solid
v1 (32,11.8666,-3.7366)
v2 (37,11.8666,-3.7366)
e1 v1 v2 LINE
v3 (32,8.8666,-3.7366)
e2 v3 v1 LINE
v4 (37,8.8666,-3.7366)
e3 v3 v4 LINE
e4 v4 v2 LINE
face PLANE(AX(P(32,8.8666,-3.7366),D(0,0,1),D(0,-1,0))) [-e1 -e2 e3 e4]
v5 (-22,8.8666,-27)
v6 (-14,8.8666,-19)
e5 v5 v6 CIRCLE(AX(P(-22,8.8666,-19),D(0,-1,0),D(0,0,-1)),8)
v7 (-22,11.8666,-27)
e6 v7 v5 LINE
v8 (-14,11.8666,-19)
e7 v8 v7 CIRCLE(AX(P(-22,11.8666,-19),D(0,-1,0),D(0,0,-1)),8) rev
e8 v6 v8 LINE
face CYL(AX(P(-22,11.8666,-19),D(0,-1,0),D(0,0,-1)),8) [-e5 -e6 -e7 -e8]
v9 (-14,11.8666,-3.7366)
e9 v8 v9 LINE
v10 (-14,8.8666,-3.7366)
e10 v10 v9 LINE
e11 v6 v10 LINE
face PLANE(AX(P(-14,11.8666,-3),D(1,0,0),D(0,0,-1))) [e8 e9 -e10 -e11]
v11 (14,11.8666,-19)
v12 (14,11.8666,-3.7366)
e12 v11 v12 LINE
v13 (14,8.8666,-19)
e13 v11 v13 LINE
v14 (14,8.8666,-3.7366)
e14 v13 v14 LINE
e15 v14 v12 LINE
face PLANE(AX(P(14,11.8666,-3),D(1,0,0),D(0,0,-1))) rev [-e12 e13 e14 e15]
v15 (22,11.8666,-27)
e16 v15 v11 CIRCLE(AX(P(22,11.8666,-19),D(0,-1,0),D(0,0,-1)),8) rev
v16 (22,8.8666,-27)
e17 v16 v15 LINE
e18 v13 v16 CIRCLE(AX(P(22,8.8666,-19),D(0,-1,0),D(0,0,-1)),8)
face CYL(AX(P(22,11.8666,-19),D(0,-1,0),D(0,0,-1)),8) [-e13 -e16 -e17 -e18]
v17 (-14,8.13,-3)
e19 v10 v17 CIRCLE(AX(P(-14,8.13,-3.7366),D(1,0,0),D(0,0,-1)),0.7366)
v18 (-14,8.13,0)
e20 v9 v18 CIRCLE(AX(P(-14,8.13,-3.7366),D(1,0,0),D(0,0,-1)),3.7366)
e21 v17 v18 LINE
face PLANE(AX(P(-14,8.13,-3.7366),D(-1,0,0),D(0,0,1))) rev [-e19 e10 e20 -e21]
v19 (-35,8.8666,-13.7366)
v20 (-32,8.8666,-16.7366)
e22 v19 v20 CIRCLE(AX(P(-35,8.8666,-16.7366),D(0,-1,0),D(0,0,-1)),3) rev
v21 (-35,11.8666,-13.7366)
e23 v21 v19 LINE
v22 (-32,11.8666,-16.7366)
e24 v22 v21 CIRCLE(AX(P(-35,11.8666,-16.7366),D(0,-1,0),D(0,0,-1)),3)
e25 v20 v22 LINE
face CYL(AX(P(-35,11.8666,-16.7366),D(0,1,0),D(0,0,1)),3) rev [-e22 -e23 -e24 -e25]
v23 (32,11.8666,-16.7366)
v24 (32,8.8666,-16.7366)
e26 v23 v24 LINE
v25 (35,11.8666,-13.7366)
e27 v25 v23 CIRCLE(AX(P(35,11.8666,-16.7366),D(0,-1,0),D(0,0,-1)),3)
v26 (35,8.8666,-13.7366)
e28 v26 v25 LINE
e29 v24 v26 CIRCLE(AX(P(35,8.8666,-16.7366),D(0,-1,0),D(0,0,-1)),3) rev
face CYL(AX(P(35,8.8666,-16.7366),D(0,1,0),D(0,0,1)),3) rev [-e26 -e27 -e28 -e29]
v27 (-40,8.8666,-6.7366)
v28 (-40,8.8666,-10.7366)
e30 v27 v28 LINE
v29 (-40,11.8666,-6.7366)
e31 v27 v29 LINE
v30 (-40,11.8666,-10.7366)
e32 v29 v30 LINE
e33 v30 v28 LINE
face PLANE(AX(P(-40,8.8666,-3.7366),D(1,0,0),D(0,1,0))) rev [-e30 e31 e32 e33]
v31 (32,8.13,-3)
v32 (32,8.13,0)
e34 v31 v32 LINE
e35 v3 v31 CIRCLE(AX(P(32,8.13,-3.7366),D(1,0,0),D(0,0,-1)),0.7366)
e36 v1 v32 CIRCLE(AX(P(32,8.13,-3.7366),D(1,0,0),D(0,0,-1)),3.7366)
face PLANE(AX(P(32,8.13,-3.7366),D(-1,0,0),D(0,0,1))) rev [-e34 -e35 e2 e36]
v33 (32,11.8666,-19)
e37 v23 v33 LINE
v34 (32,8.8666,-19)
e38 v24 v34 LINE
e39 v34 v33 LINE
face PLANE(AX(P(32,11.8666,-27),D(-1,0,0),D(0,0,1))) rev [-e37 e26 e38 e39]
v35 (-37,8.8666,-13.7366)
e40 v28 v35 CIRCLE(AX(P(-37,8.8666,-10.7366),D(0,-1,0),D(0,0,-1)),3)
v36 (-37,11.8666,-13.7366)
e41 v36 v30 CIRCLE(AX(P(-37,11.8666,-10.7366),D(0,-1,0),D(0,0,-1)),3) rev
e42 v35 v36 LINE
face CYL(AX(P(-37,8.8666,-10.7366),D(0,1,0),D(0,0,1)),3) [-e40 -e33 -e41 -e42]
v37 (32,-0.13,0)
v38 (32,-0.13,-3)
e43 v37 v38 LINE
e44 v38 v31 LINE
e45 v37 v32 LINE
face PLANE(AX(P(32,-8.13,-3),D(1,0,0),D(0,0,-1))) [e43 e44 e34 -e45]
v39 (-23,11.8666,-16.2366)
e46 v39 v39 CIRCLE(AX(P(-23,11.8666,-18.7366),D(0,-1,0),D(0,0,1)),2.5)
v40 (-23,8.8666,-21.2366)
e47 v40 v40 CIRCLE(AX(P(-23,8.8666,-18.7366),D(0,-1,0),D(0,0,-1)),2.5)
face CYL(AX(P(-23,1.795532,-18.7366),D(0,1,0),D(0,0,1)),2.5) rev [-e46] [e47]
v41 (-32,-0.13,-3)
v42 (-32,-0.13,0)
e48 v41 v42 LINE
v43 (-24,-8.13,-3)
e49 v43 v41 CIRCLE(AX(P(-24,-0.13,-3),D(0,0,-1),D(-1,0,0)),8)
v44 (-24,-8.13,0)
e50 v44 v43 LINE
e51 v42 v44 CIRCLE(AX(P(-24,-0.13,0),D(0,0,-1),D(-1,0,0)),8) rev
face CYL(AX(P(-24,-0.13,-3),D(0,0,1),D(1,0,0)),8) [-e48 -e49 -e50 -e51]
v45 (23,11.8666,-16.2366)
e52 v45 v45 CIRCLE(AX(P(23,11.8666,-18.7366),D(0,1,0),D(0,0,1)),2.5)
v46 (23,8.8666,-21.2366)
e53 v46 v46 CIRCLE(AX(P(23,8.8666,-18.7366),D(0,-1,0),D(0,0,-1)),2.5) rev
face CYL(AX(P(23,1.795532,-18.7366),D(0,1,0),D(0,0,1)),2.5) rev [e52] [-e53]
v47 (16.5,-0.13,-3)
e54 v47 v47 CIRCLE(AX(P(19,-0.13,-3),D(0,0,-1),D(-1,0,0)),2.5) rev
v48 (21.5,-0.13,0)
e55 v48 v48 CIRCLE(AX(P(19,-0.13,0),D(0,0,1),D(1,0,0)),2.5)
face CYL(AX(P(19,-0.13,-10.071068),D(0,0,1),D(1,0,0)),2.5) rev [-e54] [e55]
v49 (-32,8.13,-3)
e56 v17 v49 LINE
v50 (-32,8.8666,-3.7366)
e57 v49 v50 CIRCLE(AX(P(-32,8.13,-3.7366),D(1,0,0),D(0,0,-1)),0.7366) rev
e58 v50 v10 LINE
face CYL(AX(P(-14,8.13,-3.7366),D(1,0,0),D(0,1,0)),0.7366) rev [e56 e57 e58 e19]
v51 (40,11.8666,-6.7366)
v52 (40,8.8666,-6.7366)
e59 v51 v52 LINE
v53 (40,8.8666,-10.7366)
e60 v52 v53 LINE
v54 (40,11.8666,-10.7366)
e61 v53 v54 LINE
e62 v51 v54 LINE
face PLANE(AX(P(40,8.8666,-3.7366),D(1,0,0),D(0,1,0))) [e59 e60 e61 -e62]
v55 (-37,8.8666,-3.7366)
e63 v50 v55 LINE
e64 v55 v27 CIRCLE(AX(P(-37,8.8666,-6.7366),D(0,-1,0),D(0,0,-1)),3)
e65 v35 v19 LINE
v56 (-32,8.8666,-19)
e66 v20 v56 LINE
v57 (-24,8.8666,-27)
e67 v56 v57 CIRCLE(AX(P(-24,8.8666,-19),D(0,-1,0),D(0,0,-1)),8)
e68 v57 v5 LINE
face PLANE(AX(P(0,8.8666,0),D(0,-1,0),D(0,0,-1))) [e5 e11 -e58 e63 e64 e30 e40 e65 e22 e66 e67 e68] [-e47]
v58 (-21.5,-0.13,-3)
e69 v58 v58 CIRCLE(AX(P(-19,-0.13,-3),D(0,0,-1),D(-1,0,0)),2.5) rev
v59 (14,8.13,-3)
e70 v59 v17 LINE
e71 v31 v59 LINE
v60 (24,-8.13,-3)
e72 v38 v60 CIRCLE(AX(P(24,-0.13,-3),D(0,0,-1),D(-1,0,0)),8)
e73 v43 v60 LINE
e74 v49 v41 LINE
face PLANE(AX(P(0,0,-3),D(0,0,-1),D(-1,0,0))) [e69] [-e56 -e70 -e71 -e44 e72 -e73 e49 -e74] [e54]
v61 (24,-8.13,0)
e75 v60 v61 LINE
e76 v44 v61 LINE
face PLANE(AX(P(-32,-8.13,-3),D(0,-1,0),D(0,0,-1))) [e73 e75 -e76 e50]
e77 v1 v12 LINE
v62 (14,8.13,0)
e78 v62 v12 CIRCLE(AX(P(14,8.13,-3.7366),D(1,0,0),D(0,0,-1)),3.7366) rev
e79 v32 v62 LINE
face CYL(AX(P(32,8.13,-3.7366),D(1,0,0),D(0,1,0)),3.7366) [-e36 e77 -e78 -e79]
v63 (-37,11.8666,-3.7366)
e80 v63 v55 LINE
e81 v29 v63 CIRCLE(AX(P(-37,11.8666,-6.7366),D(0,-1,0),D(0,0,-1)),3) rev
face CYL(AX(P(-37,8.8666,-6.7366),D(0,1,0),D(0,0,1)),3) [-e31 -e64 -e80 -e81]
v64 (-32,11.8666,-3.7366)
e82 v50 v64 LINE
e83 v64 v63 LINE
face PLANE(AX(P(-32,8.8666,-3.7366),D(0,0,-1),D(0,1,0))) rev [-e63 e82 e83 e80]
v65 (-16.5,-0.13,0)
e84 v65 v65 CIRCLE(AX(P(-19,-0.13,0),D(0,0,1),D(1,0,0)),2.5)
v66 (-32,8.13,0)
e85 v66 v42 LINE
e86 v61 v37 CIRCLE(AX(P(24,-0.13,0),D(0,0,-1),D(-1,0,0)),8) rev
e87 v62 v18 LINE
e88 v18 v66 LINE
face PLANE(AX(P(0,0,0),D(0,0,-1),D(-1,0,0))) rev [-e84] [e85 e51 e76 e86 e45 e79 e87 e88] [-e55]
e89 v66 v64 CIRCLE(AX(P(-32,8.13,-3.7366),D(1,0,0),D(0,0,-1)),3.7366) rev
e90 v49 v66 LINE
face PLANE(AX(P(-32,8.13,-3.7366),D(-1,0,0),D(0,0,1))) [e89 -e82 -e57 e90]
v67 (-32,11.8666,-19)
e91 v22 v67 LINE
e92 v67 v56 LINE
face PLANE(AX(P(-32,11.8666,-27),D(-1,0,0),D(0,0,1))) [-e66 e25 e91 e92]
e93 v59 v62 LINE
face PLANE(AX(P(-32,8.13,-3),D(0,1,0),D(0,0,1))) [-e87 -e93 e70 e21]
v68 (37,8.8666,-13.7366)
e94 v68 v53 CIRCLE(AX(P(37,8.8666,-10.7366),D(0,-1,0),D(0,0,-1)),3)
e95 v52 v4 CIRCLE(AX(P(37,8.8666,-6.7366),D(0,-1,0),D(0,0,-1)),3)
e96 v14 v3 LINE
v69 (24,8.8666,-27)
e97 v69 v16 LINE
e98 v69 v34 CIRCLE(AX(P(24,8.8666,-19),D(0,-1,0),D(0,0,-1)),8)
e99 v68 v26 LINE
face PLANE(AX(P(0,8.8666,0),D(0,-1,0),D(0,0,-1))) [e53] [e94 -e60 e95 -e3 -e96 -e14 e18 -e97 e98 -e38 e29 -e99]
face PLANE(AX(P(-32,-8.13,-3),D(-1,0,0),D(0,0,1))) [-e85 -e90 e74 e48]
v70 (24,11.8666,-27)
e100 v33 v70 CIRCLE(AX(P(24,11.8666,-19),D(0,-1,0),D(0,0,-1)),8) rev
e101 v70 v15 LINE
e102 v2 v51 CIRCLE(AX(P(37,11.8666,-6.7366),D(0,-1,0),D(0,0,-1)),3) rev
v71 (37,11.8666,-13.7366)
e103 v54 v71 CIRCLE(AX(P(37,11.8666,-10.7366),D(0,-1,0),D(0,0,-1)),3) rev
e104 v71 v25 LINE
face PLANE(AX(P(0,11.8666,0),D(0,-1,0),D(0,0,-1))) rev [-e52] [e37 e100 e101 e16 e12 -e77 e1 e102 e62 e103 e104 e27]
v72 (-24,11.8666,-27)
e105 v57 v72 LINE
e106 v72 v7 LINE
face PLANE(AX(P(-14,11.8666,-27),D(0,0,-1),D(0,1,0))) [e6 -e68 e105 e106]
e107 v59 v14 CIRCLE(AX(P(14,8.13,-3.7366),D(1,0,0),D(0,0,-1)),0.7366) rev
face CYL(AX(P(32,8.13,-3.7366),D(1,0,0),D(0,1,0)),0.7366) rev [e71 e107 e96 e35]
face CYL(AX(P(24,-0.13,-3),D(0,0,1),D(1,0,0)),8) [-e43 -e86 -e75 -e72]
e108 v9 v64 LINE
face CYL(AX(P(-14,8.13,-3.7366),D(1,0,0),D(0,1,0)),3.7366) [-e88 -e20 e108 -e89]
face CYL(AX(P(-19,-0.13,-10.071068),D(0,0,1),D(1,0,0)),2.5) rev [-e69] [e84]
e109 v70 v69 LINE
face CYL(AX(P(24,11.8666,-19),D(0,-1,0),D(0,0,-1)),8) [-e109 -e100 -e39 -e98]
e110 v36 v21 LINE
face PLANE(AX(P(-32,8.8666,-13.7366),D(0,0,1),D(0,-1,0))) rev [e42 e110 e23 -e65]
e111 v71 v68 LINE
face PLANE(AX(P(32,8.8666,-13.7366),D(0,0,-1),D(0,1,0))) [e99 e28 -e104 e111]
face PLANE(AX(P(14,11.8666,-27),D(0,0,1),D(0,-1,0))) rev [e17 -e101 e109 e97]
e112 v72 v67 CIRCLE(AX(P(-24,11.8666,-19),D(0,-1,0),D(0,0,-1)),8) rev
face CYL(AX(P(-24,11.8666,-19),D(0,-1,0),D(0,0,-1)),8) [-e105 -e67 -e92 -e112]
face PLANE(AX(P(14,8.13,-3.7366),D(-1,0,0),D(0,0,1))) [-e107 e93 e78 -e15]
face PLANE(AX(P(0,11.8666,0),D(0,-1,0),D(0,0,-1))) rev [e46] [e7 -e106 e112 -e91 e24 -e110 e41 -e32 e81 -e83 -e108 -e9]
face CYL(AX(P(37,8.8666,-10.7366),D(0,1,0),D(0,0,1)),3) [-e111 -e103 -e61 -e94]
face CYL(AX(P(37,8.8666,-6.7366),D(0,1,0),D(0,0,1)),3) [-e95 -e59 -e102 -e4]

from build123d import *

# Parameters (mm, degrees)
SKETCH2_W            = 64
SKETCH2_H            = 16.26
BASE_FLANGE1_DEPTH   = 3
EDGE_FLANGE1_DEPTH   = 18
SKETCH10_R           = 2.5
CUT_EXTRUDE1_DEPTH   = 3
FILLET1_R            = 8
SKETCH14_R           = 2.5
SKETCH14_R_2         = 1
CUT_EXTRUDE5_DEPTH   = 3
SKETCH15_W           = 8
SKETCH15_H           = 10
TAB1_DEPTH           = 3
FILLET4_R            = 8
FILLET5_R            = 3
FILLET4_OF_MIRROR1_R = 8
FILLET5_OF_MIRROR1_R = 3


# Sheet-metal steps are written as plain solids
with BuildPart() as part:
    # Sketch2 → Base-Flange1 (new body)
    with BuildSketch(Plane.XY):
        Rectangle(SKETCH2_W, SKETCH2_H)
    extrude(amount=-BASE_FLANGE1_DEPTH)

    # Edge-Flange1 section (across the edge) → Edge-Flange1 (add)
    with BuildSketch(Plane(origin=(14, 8.8666, -3), x_dir=(0, -1, 0), z_dir=(1, 0, 0))):
        with BuildLine():
            Line((-3, 0.7366), (-3, 24))
            Line((-3, 24), (0, 24))
            Line((0, 24), (0, 0.7366))
            ThreePointArc((0, 0.7366), (0.215745145, 0.215745145), (0.7366, 0))
            Line((0.7366, 0), (0.7366, -3))
            ThreePointArc((0.7366, -3), (-1.905575199, -1.905575199), (-3, 0.7366))
        make_face()
    edge_flange1 = extrude(amount=EDGE_FLANGE1_DEPTH)

    # Sketch10 → Cut-Extrude1 (cut)
    with BuildSketch(Plane.XY):
        with Locations((-19, -0.13)):
            Circle(SKETCH10_R)
        with Locations((19, -0.13)):
            Circle(SKETCH10_R)
    extrude(amount=-CUT_EXTRUDE1_DEPTH, mode=Mode.SUBTRACT)

    # Fillet1
    fillet1_edges = [part.edges().sort_by_distance(p)[0] for p in [
        (32, -8.13, -1.5),
        (-32, -8.13, -1.5),
    ]]
    fillet(fillet1_edges, radius=FILLET1_R)

    # Sketch14 → Cut-Extrude5 (cut)
    with BuildSketch(Plane(origin=(0, 11.8666, 0), x_dir=(1, 0, 0), z_dir=(0, 1, 0))):
        with Locations(Location((23, 18.7366, 0), (0, 0, 270))):
            Circle(SKETCH14_R)
        with Locations((37, 22)):
            Circle(SKETCH14_R_2)
    cut_extrude5 = extrude(amount=-CUT_EXTRUDE5_DEPTH, mode=Mode.SUBTRACT)

    # Sketch15 → Tab1 (add)
    with BuildSketch(Plane(origin=(0, 11.8666, 0), x_dir=(1, 0, 0), z_dir=(0, 1, 0))):
        with Locations((36, 8.7366)):
            Rectangle(SKETCH15_W, SKETCH15_H)
    tab1 = extrude(amount=-TAB1_DEPTH)

    # Fillet4
    fillet4_edges = [part.edges().sort_by_distance(p)[0] for p in [
        (14, 10.3666, -27),
        (32, 10.3666, -27),
    ]]
    fillet(fillet4_edges, radius=FILLET4_R)

    # Fillet5
    fillet5_edges = [part.edges().sort_by_distance(p)[0] for p in [
        (32, 10.3666, -13.7366),
        (40, 10.3666, -13.7366),
        (40, 10.3666, -3.7366),
    ]]
    fillet(fillet5_edges, radius=FILLET5_R)

    # Mirror1: Edge-Flange1, Cut-Extrude5, Tab1 across plane
    add(edge_flange1.mirror(Plane(origin=(0, 0, 0), x_dir=(0, 0, 1), z_dir=(1, 0, 0))))
    add(cut_extrude5.mirror(Plane(origin=(0, 0, 0), x_dir=(0, 0, 1), z_dir=(1, 0, 0))), mode=Mode.SUBTRACT)
    add(tab1.mirror(Plane(origin=(0, 0, 0), x_dir=(0, 0, 1), z_dir=(1, 0, 0))))

    # Fillet4 of Mirror1
    fillet4_of_mirror1_edges = [part.edges().sort_by_distance(p)[0] for p in [
        (-14, 10.3666, -27),
        (-32, 10.3666, -27),
    ]]
    fillet(fillet4_of_mirror1_edges, radius=FILLET4_OF_MIRROR1_R)

    # Fillet5 of Mirror1
    fillet5_of_mirror1_edges = [part.edges().sort_by_distance(p)[0] for p in [
        (-32, 10.3666, -13.7366),
        (-40, 10.3666, -13.7366),
        (-40, 10.3666, -3.7366),
    ]]
    fillet(fillet5_of_mirror1_edges, radius=FILLET5_OF_MIRROR1_R)


solid = part.part
